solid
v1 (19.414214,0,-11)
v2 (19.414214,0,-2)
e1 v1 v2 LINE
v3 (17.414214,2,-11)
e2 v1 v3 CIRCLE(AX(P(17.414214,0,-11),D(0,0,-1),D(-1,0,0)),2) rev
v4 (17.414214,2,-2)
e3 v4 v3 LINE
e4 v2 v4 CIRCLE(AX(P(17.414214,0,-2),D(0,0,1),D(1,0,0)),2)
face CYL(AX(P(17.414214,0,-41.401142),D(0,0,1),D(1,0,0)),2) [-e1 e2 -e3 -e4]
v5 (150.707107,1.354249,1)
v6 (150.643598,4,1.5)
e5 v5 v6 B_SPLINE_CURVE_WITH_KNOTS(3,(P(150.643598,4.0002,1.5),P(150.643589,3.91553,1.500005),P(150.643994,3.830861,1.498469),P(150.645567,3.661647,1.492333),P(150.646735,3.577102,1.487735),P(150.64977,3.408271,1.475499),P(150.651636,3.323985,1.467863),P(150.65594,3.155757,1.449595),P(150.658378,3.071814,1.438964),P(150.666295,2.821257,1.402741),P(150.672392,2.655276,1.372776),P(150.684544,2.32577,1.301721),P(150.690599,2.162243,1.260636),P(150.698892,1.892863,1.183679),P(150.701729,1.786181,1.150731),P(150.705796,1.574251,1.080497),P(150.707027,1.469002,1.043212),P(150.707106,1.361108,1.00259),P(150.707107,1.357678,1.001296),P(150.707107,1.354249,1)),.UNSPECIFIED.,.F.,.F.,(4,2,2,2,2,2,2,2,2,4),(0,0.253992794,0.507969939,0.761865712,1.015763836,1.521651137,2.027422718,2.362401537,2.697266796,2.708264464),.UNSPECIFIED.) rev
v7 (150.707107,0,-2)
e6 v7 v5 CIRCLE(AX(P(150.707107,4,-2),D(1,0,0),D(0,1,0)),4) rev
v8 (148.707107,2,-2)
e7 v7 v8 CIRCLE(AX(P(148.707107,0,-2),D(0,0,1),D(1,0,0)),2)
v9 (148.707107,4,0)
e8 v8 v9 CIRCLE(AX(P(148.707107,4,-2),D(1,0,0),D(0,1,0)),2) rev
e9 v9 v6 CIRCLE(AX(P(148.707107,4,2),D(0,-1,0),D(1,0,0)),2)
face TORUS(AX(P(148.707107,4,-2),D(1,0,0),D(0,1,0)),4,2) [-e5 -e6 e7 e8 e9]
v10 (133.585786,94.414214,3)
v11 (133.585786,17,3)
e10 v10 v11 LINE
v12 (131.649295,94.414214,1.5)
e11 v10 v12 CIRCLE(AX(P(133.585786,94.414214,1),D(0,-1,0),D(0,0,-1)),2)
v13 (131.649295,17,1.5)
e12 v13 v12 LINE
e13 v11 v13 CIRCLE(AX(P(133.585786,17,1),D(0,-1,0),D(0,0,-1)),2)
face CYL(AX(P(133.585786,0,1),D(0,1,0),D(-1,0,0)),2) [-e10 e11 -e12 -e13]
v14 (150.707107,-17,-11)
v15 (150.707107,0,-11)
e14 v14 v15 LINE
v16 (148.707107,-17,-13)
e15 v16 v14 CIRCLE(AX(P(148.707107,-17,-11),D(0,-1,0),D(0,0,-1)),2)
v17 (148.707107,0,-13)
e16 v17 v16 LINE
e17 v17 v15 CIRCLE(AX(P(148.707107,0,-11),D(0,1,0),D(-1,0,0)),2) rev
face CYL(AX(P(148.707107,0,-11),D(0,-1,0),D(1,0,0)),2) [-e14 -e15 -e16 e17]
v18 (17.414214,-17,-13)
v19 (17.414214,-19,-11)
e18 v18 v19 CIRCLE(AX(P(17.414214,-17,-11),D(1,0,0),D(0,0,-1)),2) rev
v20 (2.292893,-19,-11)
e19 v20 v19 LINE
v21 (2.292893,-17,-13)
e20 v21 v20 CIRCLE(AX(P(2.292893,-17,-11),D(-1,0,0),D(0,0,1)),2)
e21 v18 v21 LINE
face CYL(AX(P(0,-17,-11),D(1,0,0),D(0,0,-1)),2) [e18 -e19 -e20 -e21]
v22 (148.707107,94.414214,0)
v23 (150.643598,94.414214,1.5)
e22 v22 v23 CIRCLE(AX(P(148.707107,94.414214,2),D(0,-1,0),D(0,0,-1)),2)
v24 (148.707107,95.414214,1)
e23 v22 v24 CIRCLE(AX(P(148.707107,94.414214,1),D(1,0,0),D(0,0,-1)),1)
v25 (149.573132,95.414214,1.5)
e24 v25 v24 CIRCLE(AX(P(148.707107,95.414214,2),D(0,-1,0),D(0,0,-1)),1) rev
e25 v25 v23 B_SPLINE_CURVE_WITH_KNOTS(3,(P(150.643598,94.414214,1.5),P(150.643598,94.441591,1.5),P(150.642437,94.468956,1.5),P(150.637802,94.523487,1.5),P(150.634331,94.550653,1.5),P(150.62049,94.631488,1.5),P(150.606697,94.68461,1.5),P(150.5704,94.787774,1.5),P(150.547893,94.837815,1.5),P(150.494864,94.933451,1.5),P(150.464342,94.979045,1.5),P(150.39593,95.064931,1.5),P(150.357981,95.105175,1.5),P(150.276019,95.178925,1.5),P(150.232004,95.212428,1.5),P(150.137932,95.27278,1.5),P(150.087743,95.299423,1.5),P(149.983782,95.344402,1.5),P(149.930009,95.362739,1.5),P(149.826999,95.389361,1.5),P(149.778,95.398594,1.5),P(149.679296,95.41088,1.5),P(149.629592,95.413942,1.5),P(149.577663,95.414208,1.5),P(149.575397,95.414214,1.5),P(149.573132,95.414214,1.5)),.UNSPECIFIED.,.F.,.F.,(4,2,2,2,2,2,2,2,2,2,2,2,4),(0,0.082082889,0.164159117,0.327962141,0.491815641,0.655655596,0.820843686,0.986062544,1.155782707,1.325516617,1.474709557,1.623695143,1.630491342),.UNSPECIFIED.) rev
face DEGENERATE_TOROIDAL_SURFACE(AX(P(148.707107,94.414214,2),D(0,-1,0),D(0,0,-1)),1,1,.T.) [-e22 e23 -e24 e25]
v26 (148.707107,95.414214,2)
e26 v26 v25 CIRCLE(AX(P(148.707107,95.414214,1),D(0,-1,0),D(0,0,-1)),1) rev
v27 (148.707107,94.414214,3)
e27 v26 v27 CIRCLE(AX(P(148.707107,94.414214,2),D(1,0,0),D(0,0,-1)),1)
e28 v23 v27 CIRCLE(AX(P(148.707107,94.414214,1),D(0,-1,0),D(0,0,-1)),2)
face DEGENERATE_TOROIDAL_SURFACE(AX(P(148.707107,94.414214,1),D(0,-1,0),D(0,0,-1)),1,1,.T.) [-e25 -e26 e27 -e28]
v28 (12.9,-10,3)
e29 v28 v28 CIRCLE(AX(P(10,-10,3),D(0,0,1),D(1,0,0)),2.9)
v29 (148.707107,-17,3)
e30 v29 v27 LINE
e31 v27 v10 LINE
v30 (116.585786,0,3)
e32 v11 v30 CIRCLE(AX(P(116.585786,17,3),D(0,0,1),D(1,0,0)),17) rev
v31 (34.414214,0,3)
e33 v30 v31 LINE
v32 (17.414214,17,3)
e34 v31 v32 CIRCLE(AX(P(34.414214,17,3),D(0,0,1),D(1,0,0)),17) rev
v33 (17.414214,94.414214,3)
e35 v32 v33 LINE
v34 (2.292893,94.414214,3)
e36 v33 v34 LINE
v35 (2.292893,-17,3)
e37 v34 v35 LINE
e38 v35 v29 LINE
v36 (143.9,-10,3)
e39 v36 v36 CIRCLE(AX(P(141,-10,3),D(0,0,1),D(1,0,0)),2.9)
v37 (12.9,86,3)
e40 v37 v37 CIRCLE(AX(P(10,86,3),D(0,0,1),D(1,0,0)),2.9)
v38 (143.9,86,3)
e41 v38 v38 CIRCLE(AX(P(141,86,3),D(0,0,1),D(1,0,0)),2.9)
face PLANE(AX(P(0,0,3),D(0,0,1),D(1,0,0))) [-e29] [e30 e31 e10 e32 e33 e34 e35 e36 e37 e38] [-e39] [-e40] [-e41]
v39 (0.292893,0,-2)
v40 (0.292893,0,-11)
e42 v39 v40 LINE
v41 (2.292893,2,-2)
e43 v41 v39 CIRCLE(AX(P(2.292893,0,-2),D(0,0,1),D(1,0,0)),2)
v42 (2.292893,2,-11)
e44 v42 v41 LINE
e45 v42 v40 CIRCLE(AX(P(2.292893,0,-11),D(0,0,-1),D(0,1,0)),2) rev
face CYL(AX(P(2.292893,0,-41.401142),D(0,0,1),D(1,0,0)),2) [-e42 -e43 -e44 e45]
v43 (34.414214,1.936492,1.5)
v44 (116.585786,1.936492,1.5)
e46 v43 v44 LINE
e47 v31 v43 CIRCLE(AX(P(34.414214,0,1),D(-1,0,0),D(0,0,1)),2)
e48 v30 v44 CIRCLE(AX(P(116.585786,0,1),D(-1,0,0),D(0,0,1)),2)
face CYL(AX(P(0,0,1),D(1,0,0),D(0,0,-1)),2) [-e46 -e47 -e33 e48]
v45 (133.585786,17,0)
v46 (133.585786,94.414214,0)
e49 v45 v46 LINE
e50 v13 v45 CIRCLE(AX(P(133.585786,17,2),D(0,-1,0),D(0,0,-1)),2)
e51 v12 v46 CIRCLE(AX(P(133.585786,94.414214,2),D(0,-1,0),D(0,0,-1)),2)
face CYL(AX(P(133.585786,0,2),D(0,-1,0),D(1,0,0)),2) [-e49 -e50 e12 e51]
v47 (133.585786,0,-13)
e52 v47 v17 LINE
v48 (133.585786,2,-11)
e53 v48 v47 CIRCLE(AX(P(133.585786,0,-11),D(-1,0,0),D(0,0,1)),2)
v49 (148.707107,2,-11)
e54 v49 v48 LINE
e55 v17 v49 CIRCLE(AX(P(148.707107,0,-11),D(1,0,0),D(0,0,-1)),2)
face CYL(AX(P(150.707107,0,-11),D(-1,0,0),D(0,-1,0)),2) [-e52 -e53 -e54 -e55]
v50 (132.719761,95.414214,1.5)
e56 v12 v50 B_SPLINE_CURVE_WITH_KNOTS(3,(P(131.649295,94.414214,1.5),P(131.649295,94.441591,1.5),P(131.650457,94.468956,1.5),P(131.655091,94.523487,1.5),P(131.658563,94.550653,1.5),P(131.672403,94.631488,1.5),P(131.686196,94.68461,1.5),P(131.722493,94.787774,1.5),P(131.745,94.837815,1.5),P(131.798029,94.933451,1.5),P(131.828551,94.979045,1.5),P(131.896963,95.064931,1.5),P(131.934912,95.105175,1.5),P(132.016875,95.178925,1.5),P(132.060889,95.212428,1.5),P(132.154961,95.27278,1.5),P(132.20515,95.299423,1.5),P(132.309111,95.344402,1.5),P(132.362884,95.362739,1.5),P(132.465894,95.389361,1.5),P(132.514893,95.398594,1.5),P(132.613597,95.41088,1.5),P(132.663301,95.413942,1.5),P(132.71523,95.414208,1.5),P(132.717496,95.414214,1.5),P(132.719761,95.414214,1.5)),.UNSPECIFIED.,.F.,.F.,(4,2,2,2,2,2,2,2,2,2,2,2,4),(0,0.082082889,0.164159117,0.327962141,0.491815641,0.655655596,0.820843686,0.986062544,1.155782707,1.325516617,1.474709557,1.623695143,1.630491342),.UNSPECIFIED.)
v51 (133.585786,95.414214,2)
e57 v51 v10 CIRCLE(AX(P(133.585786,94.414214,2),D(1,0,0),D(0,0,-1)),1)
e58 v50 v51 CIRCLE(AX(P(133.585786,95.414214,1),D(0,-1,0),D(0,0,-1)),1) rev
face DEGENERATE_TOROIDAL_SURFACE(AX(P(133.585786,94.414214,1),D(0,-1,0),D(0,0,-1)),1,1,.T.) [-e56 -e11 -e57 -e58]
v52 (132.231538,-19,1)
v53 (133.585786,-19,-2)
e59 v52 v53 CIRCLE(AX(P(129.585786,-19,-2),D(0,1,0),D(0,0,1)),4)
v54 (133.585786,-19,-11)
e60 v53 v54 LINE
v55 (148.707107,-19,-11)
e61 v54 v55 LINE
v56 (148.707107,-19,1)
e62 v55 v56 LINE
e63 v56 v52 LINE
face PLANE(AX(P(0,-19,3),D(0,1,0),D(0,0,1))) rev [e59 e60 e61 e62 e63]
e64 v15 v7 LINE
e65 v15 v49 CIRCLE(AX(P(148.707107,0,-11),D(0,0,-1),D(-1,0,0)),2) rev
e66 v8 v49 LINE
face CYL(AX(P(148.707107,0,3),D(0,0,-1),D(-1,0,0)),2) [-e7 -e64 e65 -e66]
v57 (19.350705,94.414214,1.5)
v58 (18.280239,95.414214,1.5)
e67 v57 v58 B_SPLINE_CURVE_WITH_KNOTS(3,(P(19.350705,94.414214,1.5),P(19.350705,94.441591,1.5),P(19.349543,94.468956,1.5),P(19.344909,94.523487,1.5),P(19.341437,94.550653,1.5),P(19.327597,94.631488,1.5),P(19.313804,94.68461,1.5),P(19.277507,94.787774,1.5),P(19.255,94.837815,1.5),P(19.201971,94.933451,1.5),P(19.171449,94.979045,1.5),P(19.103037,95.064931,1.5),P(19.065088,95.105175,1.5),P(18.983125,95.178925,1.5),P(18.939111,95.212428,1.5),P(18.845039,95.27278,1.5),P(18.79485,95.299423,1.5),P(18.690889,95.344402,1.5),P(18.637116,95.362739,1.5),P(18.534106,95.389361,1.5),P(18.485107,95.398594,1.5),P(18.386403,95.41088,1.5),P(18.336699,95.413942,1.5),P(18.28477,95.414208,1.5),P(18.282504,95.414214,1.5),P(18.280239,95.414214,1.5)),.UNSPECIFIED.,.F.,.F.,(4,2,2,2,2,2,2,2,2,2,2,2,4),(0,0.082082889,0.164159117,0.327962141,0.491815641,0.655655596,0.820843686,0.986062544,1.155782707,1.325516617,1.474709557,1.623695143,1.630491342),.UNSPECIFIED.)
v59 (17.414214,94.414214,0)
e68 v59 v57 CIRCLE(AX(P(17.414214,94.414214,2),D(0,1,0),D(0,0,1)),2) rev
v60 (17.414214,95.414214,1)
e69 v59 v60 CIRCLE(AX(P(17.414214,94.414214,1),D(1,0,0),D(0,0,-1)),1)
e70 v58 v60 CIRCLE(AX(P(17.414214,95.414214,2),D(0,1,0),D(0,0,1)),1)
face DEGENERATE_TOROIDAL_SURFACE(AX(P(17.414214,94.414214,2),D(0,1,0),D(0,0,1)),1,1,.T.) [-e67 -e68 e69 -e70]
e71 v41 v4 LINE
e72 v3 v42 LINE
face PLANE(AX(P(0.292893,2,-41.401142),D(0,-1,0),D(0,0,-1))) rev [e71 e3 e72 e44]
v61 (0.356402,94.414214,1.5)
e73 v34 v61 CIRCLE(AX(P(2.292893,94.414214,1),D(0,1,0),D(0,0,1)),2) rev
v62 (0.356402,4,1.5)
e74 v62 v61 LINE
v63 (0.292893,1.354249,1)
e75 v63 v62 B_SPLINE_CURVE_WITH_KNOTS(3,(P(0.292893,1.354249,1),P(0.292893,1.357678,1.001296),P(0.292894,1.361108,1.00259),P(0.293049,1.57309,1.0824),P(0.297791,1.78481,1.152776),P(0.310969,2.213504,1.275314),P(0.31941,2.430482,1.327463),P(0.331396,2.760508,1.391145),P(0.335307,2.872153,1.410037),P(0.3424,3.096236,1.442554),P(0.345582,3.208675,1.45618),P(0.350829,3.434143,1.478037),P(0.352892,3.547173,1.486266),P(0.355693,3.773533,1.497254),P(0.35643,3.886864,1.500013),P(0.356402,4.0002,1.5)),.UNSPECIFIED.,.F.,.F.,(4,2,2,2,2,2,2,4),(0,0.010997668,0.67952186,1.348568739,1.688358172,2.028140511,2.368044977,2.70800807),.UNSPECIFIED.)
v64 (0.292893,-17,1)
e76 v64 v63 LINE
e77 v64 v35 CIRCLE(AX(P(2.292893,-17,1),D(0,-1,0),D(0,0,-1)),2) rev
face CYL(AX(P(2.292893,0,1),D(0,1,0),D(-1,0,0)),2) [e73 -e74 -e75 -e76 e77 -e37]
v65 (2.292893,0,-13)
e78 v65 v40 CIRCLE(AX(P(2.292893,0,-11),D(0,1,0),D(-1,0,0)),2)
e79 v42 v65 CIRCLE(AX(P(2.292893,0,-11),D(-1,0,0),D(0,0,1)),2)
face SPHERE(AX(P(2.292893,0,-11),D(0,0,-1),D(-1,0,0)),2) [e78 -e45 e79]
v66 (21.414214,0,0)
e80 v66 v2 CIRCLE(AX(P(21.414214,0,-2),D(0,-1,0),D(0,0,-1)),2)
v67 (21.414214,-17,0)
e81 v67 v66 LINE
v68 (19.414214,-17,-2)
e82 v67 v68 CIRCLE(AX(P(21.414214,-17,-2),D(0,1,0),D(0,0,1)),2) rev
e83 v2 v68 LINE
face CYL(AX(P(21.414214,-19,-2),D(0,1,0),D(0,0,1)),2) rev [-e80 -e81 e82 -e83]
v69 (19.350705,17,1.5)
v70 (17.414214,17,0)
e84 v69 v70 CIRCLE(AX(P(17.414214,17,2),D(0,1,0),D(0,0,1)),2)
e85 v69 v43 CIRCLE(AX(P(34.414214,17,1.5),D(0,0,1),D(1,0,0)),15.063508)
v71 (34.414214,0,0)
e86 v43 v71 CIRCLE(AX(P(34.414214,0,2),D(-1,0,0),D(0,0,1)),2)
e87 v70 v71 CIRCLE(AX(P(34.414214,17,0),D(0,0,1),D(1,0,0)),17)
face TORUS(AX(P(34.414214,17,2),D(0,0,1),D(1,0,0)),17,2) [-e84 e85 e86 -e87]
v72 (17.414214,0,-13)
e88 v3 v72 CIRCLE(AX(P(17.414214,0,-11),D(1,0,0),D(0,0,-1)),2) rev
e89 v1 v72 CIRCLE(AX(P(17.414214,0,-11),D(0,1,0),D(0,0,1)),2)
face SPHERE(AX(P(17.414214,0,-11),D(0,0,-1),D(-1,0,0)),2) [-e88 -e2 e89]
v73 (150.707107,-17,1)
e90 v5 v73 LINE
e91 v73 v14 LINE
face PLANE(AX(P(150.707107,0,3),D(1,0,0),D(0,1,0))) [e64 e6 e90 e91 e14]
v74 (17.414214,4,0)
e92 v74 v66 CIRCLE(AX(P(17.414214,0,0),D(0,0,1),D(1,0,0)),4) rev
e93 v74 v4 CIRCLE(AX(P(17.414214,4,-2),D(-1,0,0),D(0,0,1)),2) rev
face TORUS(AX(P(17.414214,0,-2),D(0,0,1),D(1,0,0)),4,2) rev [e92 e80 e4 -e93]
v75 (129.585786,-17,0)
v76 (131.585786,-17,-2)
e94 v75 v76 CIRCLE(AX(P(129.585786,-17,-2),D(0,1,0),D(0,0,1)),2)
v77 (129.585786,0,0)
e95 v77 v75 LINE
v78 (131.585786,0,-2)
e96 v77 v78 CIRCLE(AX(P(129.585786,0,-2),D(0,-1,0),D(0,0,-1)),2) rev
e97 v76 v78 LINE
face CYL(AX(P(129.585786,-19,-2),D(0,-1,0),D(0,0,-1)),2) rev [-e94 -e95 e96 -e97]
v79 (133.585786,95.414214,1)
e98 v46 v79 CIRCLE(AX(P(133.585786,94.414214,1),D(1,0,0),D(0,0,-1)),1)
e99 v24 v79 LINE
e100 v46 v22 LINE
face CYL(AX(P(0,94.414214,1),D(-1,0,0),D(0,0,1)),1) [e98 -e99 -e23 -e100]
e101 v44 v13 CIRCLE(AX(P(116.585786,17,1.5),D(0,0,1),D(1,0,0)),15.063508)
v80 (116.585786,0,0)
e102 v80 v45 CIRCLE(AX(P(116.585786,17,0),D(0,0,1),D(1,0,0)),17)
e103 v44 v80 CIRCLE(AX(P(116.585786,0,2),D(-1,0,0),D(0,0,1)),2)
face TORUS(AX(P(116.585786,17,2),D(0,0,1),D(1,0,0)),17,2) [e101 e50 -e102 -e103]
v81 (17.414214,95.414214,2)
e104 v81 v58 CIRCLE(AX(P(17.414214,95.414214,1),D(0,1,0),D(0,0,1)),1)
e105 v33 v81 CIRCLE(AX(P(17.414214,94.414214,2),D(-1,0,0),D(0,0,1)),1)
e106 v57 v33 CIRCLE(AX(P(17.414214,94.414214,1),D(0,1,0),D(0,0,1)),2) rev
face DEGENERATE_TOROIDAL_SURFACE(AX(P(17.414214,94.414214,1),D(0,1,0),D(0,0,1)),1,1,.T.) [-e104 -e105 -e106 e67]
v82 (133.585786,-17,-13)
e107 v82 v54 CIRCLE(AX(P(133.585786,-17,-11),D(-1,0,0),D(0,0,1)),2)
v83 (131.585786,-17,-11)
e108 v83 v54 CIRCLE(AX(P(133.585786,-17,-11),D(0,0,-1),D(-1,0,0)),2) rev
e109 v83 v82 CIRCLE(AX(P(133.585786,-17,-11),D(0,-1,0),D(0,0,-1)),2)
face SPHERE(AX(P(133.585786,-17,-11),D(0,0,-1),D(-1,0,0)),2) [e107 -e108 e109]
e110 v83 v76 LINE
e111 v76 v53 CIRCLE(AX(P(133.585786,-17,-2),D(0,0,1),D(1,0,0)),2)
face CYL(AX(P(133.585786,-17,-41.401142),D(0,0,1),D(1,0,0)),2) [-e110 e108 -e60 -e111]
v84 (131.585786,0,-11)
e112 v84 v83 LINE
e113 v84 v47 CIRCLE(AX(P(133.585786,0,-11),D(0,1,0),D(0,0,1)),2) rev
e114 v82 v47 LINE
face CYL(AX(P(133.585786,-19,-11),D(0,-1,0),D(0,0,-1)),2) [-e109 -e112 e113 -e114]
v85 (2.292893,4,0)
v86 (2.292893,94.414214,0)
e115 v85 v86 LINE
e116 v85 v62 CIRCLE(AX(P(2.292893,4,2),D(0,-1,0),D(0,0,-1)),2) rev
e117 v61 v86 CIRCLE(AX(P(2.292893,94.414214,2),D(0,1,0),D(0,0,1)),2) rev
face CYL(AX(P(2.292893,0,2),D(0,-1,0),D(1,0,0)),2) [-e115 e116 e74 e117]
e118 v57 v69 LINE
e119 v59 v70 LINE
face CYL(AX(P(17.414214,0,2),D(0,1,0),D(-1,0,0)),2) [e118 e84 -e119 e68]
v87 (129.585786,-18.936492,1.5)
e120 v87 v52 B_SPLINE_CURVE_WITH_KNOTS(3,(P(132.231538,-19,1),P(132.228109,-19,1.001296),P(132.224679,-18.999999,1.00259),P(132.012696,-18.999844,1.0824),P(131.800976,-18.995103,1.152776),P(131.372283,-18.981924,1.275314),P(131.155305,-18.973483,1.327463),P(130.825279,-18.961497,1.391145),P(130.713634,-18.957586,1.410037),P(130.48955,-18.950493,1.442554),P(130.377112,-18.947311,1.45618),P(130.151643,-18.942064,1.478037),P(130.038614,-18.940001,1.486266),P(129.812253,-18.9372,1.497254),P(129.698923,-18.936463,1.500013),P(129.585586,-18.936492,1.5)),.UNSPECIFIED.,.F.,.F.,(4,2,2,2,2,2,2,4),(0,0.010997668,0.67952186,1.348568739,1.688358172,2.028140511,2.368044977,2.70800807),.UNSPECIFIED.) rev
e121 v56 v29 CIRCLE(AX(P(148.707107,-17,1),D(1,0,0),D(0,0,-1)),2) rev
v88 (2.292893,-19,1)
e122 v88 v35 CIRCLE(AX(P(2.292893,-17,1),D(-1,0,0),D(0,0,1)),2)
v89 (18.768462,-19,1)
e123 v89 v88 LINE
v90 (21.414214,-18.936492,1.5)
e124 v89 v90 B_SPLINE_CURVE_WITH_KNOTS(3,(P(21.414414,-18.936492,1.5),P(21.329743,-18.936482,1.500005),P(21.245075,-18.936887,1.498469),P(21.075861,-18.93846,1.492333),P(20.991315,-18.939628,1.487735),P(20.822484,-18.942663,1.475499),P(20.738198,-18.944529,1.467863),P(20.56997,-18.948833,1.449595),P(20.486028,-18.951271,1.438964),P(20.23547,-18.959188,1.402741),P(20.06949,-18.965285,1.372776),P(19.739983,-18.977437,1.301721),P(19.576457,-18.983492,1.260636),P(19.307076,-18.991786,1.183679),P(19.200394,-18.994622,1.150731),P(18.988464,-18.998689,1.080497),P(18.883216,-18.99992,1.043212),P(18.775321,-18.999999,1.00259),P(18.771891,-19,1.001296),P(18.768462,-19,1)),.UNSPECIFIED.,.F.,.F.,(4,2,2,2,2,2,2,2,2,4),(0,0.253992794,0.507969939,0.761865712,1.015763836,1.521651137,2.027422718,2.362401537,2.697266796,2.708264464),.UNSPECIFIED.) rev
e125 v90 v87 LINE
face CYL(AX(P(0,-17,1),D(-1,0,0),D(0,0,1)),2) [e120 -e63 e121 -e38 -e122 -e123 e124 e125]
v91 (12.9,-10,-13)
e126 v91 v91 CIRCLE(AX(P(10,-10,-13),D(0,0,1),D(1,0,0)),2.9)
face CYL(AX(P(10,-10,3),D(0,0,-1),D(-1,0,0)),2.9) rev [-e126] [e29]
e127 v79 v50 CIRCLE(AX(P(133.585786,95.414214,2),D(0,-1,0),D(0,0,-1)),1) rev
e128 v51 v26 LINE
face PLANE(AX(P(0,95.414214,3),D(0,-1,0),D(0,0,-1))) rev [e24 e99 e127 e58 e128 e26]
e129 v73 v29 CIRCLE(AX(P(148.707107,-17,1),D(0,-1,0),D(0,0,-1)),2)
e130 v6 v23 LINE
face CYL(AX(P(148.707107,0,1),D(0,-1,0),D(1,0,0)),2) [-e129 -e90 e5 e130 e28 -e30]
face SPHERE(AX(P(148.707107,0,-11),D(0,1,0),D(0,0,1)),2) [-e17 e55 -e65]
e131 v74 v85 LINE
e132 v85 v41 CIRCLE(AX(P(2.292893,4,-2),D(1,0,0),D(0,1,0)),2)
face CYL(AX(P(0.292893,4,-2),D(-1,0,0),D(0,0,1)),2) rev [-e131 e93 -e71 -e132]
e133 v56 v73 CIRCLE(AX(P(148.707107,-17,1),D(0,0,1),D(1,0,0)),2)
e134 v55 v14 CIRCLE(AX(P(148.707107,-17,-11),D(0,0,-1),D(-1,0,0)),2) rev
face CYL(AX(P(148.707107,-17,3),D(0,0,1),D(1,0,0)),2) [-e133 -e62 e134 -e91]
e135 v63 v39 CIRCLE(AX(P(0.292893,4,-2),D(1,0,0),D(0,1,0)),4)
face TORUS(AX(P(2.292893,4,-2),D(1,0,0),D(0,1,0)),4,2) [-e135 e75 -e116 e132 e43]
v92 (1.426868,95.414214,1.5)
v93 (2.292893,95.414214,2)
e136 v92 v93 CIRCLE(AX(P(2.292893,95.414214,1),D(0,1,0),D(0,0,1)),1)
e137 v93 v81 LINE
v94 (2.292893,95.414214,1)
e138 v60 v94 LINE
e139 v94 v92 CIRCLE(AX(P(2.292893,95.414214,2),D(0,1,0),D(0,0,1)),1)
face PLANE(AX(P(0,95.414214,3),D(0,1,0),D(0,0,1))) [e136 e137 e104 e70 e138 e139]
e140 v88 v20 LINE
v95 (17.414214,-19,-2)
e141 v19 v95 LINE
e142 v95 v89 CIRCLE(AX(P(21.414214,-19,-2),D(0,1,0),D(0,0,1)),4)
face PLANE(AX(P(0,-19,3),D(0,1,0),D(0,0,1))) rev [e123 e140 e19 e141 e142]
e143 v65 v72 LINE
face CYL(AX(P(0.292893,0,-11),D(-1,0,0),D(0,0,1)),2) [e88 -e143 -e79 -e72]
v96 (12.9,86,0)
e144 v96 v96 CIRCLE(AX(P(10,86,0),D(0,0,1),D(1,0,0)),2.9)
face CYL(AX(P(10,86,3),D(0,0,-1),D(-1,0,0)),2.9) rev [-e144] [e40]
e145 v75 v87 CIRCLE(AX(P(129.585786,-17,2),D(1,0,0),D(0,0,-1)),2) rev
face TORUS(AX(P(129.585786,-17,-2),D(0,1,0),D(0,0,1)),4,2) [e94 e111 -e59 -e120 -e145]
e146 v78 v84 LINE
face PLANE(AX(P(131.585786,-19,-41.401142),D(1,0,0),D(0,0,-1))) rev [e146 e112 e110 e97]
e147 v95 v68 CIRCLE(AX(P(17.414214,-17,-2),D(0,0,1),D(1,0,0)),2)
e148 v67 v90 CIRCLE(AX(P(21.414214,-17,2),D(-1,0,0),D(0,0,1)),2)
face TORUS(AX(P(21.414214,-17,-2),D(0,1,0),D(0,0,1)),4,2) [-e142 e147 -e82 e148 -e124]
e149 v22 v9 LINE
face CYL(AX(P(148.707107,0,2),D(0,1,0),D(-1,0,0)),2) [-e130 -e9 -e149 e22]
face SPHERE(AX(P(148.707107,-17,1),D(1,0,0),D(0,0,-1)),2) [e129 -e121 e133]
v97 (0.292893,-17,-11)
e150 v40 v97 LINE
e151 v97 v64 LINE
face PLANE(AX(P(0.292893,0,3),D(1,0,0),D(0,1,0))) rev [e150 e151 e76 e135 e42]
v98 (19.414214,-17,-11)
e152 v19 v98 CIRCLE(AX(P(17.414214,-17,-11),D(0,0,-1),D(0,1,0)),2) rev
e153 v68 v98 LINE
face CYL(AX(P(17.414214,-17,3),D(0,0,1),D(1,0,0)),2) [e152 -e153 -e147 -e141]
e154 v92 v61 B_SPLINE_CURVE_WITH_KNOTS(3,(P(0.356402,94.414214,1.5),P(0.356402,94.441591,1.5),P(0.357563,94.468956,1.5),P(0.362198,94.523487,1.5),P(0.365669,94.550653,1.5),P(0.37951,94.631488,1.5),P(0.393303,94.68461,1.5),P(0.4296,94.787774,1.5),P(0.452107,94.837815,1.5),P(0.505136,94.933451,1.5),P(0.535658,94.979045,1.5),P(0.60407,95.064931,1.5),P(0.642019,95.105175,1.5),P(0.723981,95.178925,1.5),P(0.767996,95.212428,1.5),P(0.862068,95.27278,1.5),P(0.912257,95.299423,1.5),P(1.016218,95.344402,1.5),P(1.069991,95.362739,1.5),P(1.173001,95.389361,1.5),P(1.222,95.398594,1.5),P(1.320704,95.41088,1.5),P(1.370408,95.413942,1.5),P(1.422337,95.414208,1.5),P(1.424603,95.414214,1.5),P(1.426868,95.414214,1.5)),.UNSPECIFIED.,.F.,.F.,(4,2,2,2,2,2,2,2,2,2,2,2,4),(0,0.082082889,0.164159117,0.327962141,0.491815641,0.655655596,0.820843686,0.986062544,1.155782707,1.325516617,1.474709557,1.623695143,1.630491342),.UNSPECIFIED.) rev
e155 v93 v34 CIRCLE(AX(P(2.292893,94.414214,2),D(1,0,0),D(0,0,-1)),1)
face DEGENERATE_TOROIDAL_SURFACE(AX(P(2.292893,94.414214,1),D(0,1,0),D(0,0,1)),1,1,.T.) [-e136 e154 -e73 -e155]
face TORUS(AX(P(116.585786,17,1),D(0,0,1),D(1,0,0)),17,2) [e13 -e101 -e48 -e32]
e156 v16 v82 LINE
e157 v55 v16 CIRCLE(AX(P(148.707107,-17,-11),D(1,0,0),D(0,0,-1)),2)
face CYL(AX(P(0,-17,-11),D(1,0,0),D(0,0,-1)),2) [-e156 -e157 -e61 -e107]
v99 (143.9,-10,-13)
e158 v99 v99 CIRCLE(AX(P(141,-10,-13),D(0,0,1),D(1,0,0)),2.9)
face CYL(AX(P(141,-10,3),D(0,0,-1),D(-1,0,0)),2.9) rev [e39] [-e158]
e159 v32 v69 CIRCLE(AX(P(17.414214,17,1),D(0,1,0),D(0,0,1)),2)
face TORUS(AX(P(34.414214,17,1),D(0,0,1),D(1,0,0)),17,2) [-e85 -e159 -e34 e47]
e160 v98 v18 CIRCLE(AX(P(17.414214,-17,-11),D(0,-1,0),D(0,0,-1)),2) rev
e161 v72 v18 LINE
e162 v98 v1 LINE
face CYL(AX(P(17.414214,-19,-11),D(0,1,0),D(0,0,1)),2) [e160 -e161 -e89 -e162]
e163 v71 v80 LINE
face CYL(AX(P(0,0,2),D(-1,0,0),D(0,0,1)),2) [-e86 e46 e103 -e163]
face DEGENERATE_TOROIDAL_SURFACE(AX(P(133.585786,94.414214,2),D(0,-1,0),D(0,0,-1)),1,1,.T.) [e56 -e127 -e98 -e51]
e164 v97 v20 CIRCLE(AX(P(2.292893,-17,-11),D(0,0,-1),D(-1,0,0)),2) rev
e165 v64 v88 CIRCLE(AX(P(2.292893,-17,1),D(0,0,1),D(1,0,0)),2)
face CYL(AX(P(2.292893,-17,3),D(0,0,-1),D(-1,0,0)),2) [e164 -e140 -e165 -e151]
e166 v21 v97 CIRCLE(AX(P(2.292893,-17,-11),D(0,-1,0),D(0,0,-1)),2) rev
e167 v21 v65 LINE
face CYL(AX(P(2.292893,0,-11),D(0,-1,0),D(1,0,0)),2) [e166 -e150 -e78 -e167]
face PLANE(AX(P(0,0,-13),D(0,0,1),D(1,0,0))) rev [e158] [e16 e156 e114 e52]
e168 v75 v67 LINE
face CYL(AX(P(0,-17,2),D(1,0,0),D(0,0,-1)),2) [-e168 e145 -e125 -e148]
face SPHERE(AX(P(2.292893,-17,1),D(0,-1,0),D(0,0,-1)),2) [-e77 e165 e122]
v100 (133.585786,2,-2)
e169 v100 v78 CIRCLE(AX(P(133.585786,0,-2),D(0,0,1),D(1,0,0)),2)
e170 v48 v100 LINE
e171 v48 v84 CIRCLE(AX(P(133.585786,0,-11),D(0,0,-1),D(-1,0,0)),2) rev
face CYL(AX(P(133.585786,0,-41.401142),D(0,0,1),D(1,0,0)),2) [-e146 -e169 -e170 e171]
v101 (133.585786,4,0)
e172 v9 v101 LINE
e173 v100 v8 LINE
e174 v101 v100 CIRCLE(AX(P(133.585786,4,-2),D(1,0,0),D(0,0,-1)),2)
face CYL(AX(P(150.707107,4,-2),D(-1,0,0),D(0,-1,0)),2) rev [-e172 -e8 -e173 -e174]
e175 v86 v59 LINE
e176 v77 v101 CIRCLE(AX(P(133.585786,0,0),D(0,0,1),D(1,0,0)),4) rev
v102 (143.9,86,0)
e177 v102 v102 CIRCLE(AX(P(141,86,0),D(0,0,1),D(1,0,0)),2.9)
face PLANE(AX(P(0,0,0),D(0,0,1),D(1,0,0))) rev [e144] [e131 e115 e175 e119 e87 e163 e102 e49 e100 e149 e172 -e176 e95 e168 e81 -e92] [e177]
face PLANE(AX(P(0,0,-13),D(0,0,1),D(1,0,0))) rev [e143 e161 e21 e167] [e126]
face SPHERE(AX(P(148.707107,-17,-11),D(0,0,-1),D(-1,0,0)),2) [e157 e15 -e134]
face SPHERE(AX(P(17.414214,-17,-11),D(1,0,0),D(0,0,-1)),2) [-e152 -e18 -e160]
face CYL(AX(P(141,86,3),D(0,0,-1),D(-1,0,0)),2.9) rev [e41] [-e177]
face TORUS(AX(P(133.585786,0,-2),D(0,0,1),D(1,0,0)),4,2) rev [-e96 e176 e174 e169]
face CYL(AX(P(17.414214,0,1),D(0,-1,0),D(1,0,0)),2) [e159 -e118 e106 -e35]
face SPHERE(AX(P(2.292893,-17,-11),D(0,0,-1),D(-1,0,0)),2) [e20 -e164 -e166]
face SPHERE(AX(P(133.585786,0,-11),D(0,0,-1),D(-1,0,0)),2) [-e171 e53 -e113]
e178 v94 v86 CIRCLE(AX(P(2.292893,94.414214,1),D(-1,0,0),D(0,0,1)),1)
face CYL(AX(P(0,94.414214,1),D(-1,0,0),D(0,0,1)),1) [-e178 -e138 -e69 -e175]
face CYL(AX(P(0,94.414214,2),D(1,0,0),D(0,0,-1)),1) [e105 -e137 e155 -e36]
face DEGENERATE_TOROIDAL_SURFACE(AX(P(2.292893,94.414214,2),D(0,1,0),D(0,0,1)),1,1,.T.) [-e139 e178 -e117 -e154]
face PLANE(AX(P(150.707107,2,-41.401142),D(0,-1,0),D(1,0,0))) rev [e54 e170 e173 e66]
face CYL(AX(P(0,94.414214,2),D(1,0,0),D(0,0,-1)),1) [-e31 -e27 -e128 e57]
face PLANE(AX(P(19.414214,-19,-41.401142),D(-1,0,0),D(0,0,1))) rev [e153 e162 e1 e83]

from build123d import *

# Parameters (mm, degrees)
ESQUISSE1_W        = 19.121320343
ESQUISSE1_H        = 114.414213562
ESQUISSE1_R        = 2.9
ESQUISSE1_W_2      = 112.171572876
ESQUISSE1_H_2      = 21
BOSS_EXTRU_1_DEPTH = 3
BOSS_EXTRU_2_START = 13
ESQUISSE2_W        = 19.121320343
ESQUISSE2_H        = 21
ESQUISSE2_R        = 2.9
BOSS_EXTRU_2_DEPTH = 13
CONG_1_R           = 15
CONG_2_R           = 2
CONG_3_R           = 1


# Some blends are built 0.0001 mm under size
with BuildPart() as part:
    # Esquisse1 → Boss.-Extru.1 (new body)
    # profile 1 of 3: a face of its own
    with BuildSketch(Plane.XY):
        with Locations((9.853553391, 38.207106781)):
            Rectangle(ESQUISSE1_W, ESQUISSE1_H)
        with Locations((10, 86)):
            Circle(ESQUISSE1_R, mode=Mode.SUBTRACT)
        with Locations((10, -10)):
            Circle(ESQUISSE1_R, mode=Mode.SUBTRACT)
    # profile 2 of 3: a face of its own
    with BuildSketch(Plane.XY):
        with Locations((75.5, -8.5)):
            Rectangle(ESQUISSE1_W_2, ESQUISSE1_H_2)
    # profile 3 of 3: a face of its own
    with BuildSketch(Plane.XY):
        with Locations((141.14644661, 38.207106781)):
            Rectangle(ESQUISSE1_W, ESQUISSE1_H)
        with Locations((141, 86)):
            Circle(ESQUISSE1_R, mode=Mode.SUBTRACT)
        with Locations((141, -10)):
            Circle(ESQUISSE1_R, mode=Mode.SUBTRACT)
    extrude(amount=BOSS_EXTRU_1_DEPTH)

    # Esquisse2 → Boss.-Extru.2 (add)
    # profile 1 of 2: a face of its own
    with BuildSketch(Plane(origin=(0, 0, 0), x_dir=(-1, 0, 0), z_dir=(0, 0, -1)).offset(BOSS_EXTRU_2_START)):
        with Locations((-141.14644661, -8.5)):
            Rectangle(ESQUISSE2_W, ESQUISSE2_H)
        with Locations(Location((-141, -10, 0), (0, 0, 180))):
            Circle(ESQUISSE2_R, mode=Mode.SUBTRACT)
    # profile 2 of 2: a face of its own
    with BuildSketch(Plane(origin=(0, 0, 0), x_dir=(-1, 0, 0), z_dir=(0, 0, -1)).offset(BOSS_EXTRU_2_START)):
        with Locations((-9.853553391, -8.5)):
            Rectangle(ESQUISSE2_W, ESQUISSE2_H)
        with Locations(Location((-10, -10, 0), (0, 0, 180))):
            Circle(ESQUISSE2_R, mode=Mode.SUBTRACT)
    extrude(amount=-BOSS_EXTRU_2_DEPTH)

    # Congé1
    # the kernel refuses this fillet: 15 mm, written as the material it adds along each edge
    with BuildSketch(Plane(origin=(19.414213562, 2, 0), x_dir=(0, 1, 0), z_dir=(0, 0, 1)), Plane(origin=(131.585786438, 2, 0), x_dir=(-1, 0, 0), z_dir=(0, 0, 1))) as cong_1_piece_1:
        with BuildLine():
            CenterArc((CONG_1_R, -CONG_1_R), CONG_1_R, 90, 90)
            Line((0, -CONG_1_R), (0, 0))
            Line((0, 0), (CONG_1_R, 0))
        make_face()
    extrude(amount=3)

    # Congé2
    # the kernel refuses this fillet: 2 mm, written as the material it takes off along each edge
    with BuildSketch(Plane(origin=(17.414213562, 0, -11), x_dir=(0, 0, -1), z_dir=(1, 0, 0))) as cong_2_piece_1_section:
        Polygon((0, 0), (CONG_2_R, 0), (CONG_2_R, CONG_2_R), (0, CONG_2_R), align=None)
    cong_2_piece_1 = extrude(amount=CONG_2_R, mode=Mode.PRIVATE)
    cong_2_piece_1 = cong_2_piece_1 - Plane(origin=(17.414213562, 0, -11), x_dir=(0, -0.7071067811865475, 0.7071067811865475), z_dir=(1, 0, 0)) * Sphere(CONG_2_R, mode=Mode.PRIVATE)
    add(cong_2_piece_1, mode=Mode.SUBTRACT)
    with BuildSketch(Plane(origin=(133.585786438, 0, -11), x_dir=(0, 0, -1), z_dir=(-1, 0, 0))) as cong_2_piece_2_section:
        Polygon((0, 0), (CONG_2_R, 0), (CONG_2_R, -CONG_2_R), (0, -CONG_2_R), align=None)
    cong_2_piece_2 = extrude(amount=CONG_2_R, mode=Mode.PRIVATE)
    cong_2_piece_2 = cong_2_piece_2 - Plane(origin=(133.585786438, 0, -11), x_dir=(0, -0.7071067811865475, 0.7071067811865475), z_dir=(-1, 0, 0)) * Sphere(CONG_2_R, mode=Mode.PRIVATE)
    add(cong_2_piece_2, mode=Mode.SUBTRACT)
    with BuildSketch(Plane(origin=(2.292893219, -17, -11), x_dir=(0, -1, 0), z_dir=(-1, 0, 0))) as cong_2_piece_3_section:
        Polygon((0, 0), (CONG_2_R, 0), (CONG_2_R, -CONG_2_R), (0, -CONG_2_R), align=None)
    cong_2_piece_3 = extrude(amount=CONG_2_R, mode=Mode.PRIVATE)
    cong_2_piece_3 = cong_2_piece_3 - Plane(origin=(2.292893219, -17, -11), x_dir=(0, 0.7071067811865475, 0.7071067811865475), z_dir=(-1, 0, 0)) * Sphere(CONG_2_R, mode=Mode.PRIVATE)
    add(cong_2_piece_3, mode=Mode.SUBTRACT)
    with BuildSketch(Plane(origin=(2.292893219, -17, 1), x_dir=(0, -1, 0), z_dir=(-1, 0, 0))) as cong_2_piece_4_section:
        Polygon((0, 0), (CONG_2_R, 0), (CONG_2_R, CONG_2_R), (0, CONG_2_R), align=None)
    cong_2_piece_4 = extrude(amount=CONG_2_R, mode=Mode.PRIVATE)
    cong_2_piece_4 = cong_2_piece_4 - Plane(origin=(2.292893219, -17, 1), x_dir=(0, 0.7071067811865475, -0.7071067811865475), z_dir=(-1, 0, 0)) * Sphere(CONG_2_R, mode=Mode.PRIVATE)
    add(cong_2_piece_4, mode=Mode.SUBTRACT)
    with BuildSketch(Plane(origin=(148.707106781, -17, -11), x_dir=(1, 0, 0), z_dir=(0, -1, 0))) as cong_2_piece_5_section:
        Polygon((0, 0), (CONG_2_R, 0), (CONG_2_R, -CONG_2_R), (0, -CONG_2_R), align=None)
    cong_2_piece_5 = extrude(amount=CONG_2_R, mode=Mode.PRIVATE)
    cong_2_piece_5 = cong_2_piece_5 - Plane(origin=(148.707106781, -17, -11), x_dir=(-0.7071067811865475, 0, 0.7071067811865475), z_dir=(0, -1, 0)) * Sphere(CONG_2_R, mode=Mode.PRIVATE)
    add(cong_2_piece_5, mode=Mode.SUBTRACT)
    with BuildSketch(Plane(origin=(148.707106781, -17, 1), x_dir=(1, 0, 0), z_dir=(0, -1, 0))) as cong_2_piece_6_section:
        Polygon((0, 0), (CONG_2_R, 0), (CONG_2_R, CONG_2_R), (0, CONG_2_R), align=None)
    cong_2_piece_6 = extrude(amount=CONG_2_R, mode=Mode.PRIVATE)
    cong_2_piece_6 = cong_2_piece_6 - Plane(origin=(148.707106781, -17, 1), x_dir=(-0.7071067811865475, 0, -0.7071067811865475), z_dir=(0, -1, 0)) * Sphere(CONG_2_R, mode=Mode.PRIVATE)
    add(cong_2_piece_6, mode=Mode.SUBTRACT)
    with BuildSketch(Plane(origin=(17.414213562, 2, -13), x_dir=(0, 0, 1), z_dir=(-1, 0, 0)), Plane(origin=(2.292893219, -19, -13), x_dir=(0, 0, 1), z_dir=(1, 0, 0)), Plane(origin=(126.585786438, -19, -13), x_dir=(0, 0, 1), z_dir=(1, 0, 0))) as cong_2_piece_7:
        with BuildLine():
            CenterArc((CONG_2_R, -CONG_2_R), CONG_2_R, 90, 90)
            Line((0, -CONG_2_R), (0, 0))
            Line((0, 0), (CONG_2_R, 0))
        make_face()
    extrude(amount=22.121320344, mode=Mode.SUBTRACT)
    with BuildSketch(Plane(origin=(155.707106781, 2, -13), x_dir=(0, -1, 0), z_dir=(-1, 0, 0))) as cong_2_piece_8:
        with BuildLine():
            CenterArc((CONG_2_R, CONG_2_R), CONG_2_R, 180, 90)
            Line((0, CONG_2_R), (0, 0))
            Line((0, 0), (CONG_2_R, 0))
        make_face()
    extrude(amount=22.121320344, mode=Mode.SUBTRACT)
    with BuildSketch(Plane(origin=(19.414213562, 17, 3), x_dir=(0, 0, -1), z_dir=(0, 1, 0)), Plane(origin=(131.585786438, 17, 3), x_dir=(1, 0, 0), z_dir=(0, 1, 0))) as cong_2_piece_9:
        with BuildLine():
            CenterArc((CONG_2_R, CONG_2_R), CONG_2_R, 180, 90)
            Line((0, CONG_2_R), (0, 0))
            Line((0, 0), (CONG_2_R, 0))
        make_face()
    extrude(amount=83.414213562, mode=Mode.SUBTRACT)
    with BuildSketch(Plane(origin=(19.414213562, 17, 0), x_dir=(0, 0, 1), z_dir=(0, 1, 0)), Plane(origin=(131.585786438, 17, 0), x_dir=(1, 0, 0), z_dir=(0, 1, 0))) as cong_2_piece_10:
        with BuildLine():
            CenterArc((CONG_2_R, -CONG_2_R), CONG_2_R, 90, 90)
            Line((0, -CONG_2_R), (0, 0))
            Line((0, 0), (CONG_2_R, 0))
        make_face()
    extrude(amount=83.414213562, mode=Mode.SUBTRACT)
    with BuildSketch(Plane(origin=(34.414213562, 17, 3), x_dir=(-1, 0, 0), z_dir=(0, 1, 0))) as cong_2_piece_11:
        with BuildLine():
            CenterArc((15 + CONG_2_R, -CONG_2_R), CONG_2_R, 90, 90)
            Line((15 + CONG_2_R, 0), (15, 0))
            Line((15, 0), (15, -CONG_2_R))
        make_face()
    revolve(axis=Axis((34.414213562, 17, 3), (0, 0, 1)), revolution_arc=90, mode=Mode.SUBTRACT)
    with BuildSketch(Plane(origin=(34.414213562, 17, 0), x_dir=(-1, 0, 0), z_dir=(0, 1, 0))) as cong_2_piece_12:
        with BuildLine():
            CenterArc((15 + CONG_2_R, CONG_2_R), CONG_2_R, 180, 90)
            Line((15 + CONG_2_R, 0), (15, 0))
            Line((15, 0), (15, CONG_2_R))
        make_face()
    revolve(axis=Axis((34.414213562, 17, 0), (0, 0, 1)), revolution_arc=90, mode=Mode.SUBTRACT)
    with BuildSketch(Plane(origin=(116.585786438, 2, 3), x_dir=(0, 0, -1), z_dir=(-1, 0, 0))) as cong_2_piece_13:
        with BuildLine():
            CenterArc((CONG_2_R, CONG_2_R), CONG_2_R, 180, 90)
            Line((0, CONG_2_R), (0, 0))
            Line((0, 0), (CONG_2_R, 0))
        make_face()
    extrude(amount=82.171572875, mode=Mode.SUBTRACT)
    with BuildSketch(Plane(origin=(116.585786438, 2, 0), x_dir=(0, 0, 1), z_dir=(-1, 0, 0))) as cong_2_piece_14:
        with BuildLine():
            CenterArc((CONG_2_R, -CONG_2_R), CONG_2_R, 90, 90)
            Line((0, -CONG_2_R), (0, 0))
            Line((0, 0), (CONG_2_R, 0))
        make_face()
    extrude(amount=82.171572875, mode=Mode.SUBTRACT)
    with BuildSketch(Plane(origin=(0.292893219, -19, -11), x_dir=(0, 1, 0), z_dir=(0, 0, 1)), Plane(origin=(150.707106781, -19, -11), x_dir=(-1, 0, 0), z_dir=(0, 0, 1))) as cong_2_piece_15:
        with BuildLine():
            CenterArc((CONG_2_R, -CONG_2_R), CONG_2_R, 90, 90)
            Line((0, -CONG_2_R), (0, 0))
            Line((0, 0), (CONG_2_R, 0))
        make_face()
    extrude(amount=12, mode=Mode.SUBTRACT)
    with BuildSketch(Plane(origin=(19.414213562, -24, -13), x_dir=(0, 0, 1), z_dir=(0, 1, 0)), Plane(origin=(150.707106781, -17, -13), x_dir=(0, 0, 1), z_dir=(0, 1, 0)), Plane(origin=(131.585786438, 0, -13), x_dir=(0, 0, 1), z_dir=(0, -1, 0)), Plane(origin=(0.292893219, 7, -13), x_dir=(0, 0, 1), z_dir=(0, -1, 0))) as cong_2_piece_16:
        with BuildLine():
            CenterArc((CONG_2_R, -CONG_2_R), CONG_2_R, 90, 90)
            Line((0, -CONG_2_R), (0, 0))
            Line((0, 0), (CONG_2_R, 0))
        make_face()
    extrude(amount=24, mode=Mode.SUBTRACT)
    with BuildSketch(Plane(origin=(19.414213562, 2, -11), x_dir=(-1, 0, 0), z_dir=(0, 0, 1)), Plane(origin=(131.585786438, 2, -11), x_dir=(0, -1, 0), z_dir=(0, 0, 1))) as cong_2_piece_17:
        with BuildLine():
            CenterArc((CONG_2_R, CONG_2_R), CONG_2_R, 180, 90)
            Line((0, CONG_2_R), (0, 0))
            Line((0, 0), (CONG_2_R, 0))
        make_face()
    extrude(amount=11, mode=Mode.SUBTRACT)
    with BuildSketch(Plane(origin=(0.292893219, 100.414213562, 3), x_dir=(1, 0, 0), z_dir=(0, -1, 0))) as cong_2_piece_18:
        with BuildLine():
            CenterArc((CONG_2_R, -CONG_2_R), CONG_2_R, 90, 90)
            Line((0, -CONG_2_R), (0, 0))
            Line((0, 0), (CONG_2_R, 0))
        make_face()
    extrude(amount=117.414213562, mode=Mode.SUBTRACT)
    with BuildSketch(Plane(origin=(148.707106781, -19, 3), x_dir=(0, 1, 0), z_dir=(-1, 0, 0))) as cong_2_piece_19:
        with BuildLine():
            CenterArc((CONG_2_R, CONG_2_R), CONG_2_R, 180, 90)
            Line((0, CONG_2_R), (0, 0))
            Line((0, 0), (CONG_2_R, 0))
        make_face()
    extrude(amount=146.414213562, mode=Mode.SUBTRACT)
    with BuildSketch(Plane(origin=(116.585786438, 17, 3), x_dir=(0, -1, 0), z_dir=(-1, 0, 0))) as cong_2_piece_20:
        with BuildLine():
            CenterArc((15 + CONG_2_R, -CONG_2_R), CONG_2_R, 90, 90)
            Line((15, -CONG_2_R), (15, 0))
            Line((15, 0), (15 + CONG_2_R, 0))
        make_face()
    revolve(axis=Axis((116.585786438, 17, 3), (0, 0, 1)), revolution_arc=90, mode=Mode.SUBTRACT)
    with BuildSketch(Plane(origin=(116.585786438, 17, 0), x_dir=(0, -1, 0), z_dir=(-1, 0, 0))) as cong_2_piece_21:
        with BuildLine():
            CenterArc((15 + CONG_2_R, CONG_2_R), CONG_2_R, 180, 90)
            Line((15, CONG_2_R), (15, 0))
            Line((15, 0), (15 + CONG_2_R, 0))
        make_face()
    revolve(axis=Axis((116.585786438, 17, 0), (0, 0, 1)), revolution_arc=90, mode=Mode.SUBTRACT)
    with BuildSketch(Plane(origin=(150.707106781, 100.414213562, 3), x_dir=(-1, 0, 0), z_dir=(0, -1, 0))) as cong_2_piece_22:
        with BuildLine():
            CenterArc((CONG_2_R, CONG_2_R), CONG_2_R, 180, 90)
            Line((0, CONG_2_R), (0, 0))
            Line((0, 0), (CONG_2_R, 0))
        make_face()
    extrude(amount=117.414213562, mode=Mode.SUBTRACT)
    # the kernel refuses this fillet: 2 mm, written as the material it adds along each edge
    with BuildSketch(Plane(origin=(17.414213562, 2, 0), x_dir=(0, 1, 0), z_dir=(-1, 0, 0)), Plane(origin=(150.707106781, 2, 0), x_dir=(0, 1, 0), z_dir=(-1, 0, 0))) as cong_2_2_piece_1:
        with BuildLine():
            CenterArc((CONG_2_R, CONG_2_R), CONG_2_R, 180, 90)
            Line((0, CONG_2_R), (0, 0))
            Line((0, 0), (CONG_2_R, 0))
        make_face()
    extrude(amount=17.121320344)
    with BuildSketch(Plane(origin=(19.414213562, -19, 0), x_dir=(1, 0, 0), z_dir=(0, 1, 0)), Plane(origin=(131.585786438, 0, 0), x_dir=(-1, 0, 0), z_dir=(0, -1, 0))) as cong_2_2_piece_2:
        with BuildLine():
            CenterArc((CONG_2_R, CONG_2_R), CONG_2_R, 180, 90)
            Line((0, CONG_2_R), (0, 0))
            Line((0, 0), (CONG_2_R, 0))
        make_face()
    extrude(amount=19)
    with BuildSketch(Plane(origin=(133.585786438, 0, 0), x_dir=(-1, 0, 0), z_dir=(0, -1, 0))) as cong_2_2_piece_3:
        with BuildLine():
            CenterArc((2 + CONG_2_R, CONG_2_R), CONG_2_R, 180, 90)
            Line((2, CONG_2_R), (2, 0))
            Line((2, 0), (2 + CONG_2_R, 0))
        make_face()
    revolve(axis=Axis((133.585786438, 0, 0), (0, 0, -1)), revolution_arc=90)
    with BuildSketch(Plane(origin=(17.414213562, 0, 0), x_dir=(0, 1, 0), z_dir=(-1, 0, 0))) as cong_2_2_piece_4:
        with BuildLine():
            CenterArc((2 + CONG_2_R, CONG_2_R), CONG_2_R, 180, 90)
            Line((2, CONG_2_R), (2, 0))
            Line((2, 0), (2 + CONG_2_R, 0))
        make_face()
    revolve(axis=Axis((17.414213562, 0, 0), (0, 0, -1)), revolution_arc=90)
    # the kernel refuses this fillet: 2 mm, written as the material it takes off along each edge
    with BuildSketch(Plane(origin=(133.585786438, -17, -11), x_dir=(-1, 0, 0), z_dir=(0, -1, 0))) as cong_2_3_piece_1_section:
        Polygon((0, 0), (CONG_2_R, 0), (CONG_2_R, CONG_2_R), (0, CONG_2_R), align=None)
    cong_2_3_piece_1 = extrude(amount=CONG_2_R, mode=Mode.PRIVATE)
    cong_2_3_piece_1 = cong_2_3_piece_1 - Plane(origin=(133.585786438, -17, -11), x_dir=(0.7071067811865475, 0, 0.7071067811865475), z_dir=(0, -1, 0)) * Sphere(CONG_2_R, mode=Mode.PRIVATE)
    add(cong_2_3_piece_1, mode=Mode.SUBTRACT)
    with BuildSketch(Plane(origin=(17.414213562, -17, -11), x_dir=(1, 0, 0), z_dir=(0, -1, 0))) as cong_2_3_piece_2_section:
        Polygon((0, 0), (CONG_2_R, 0), (CONG_2_R, -CONG_2_R), (0, -CONG_2_R), align=None)
    cong_2_3_piece_2 = extrude(amount=CONG_2_R, mode=Mode.PRIVATE)
    cong_2_3_piece_2 = cong_2_3_piece_2 - Plane(origin=(17.414213562, -17, -11), x_dir=(-0.7071067811865475, 0, 0.7071067811865475), z_dir=(0, -1, 0)) * Sphere(CONG_2_R, mode=Mode.PRIVATE)
    add(cong_2_3_piece_2, mode=Mode.SUBTRACT)
    with BuildSketch(Plane(origin=(2.292893219, 0, -11), x_dir=(0, 1, 0), z_dir=(-1, 0, 0))) as cong_2_3_piece_3_section:
        Polygon((0, 0), (CONG_2_R, 0), (CONG_2_R, CONG_2_R), (0, CONG_2_R), align=None)
    cong_2_3_piece_3 = extrude(amount=CONG_2_R, mode=Mode.PRIVATE)
    cong_2_3_piece_3 = cong_2_3_piece_3 - Plane(origin=(2.292893219, 0, -11), x_dir=(0, -0.7071067811865475, 0.7071067811865475), z_dir=(-1, 0, 0)) * Sphere(CONG_2_R, mode=Mode.PRIVATE)
    add(cong_2_3_piece_3, mode=Mode.SUBTRACT)
    with BuildSketch(Plane(origin=(148.707106781, 0, -11), x_dir=(0, 1, 0), z_dir=(1, 0, 0))) as cong_2_3_piece_4_section:
        Polygon((0, 0), (CONG_2_R, 0), (CONG_2_R, -CONG_2_R), (0, -CONG_2_R), align=None)
    cong_2_3_piece_4 = extrude(amount=CONG_2_R, mode=Mode.PRIVATE)
    cong_2_3_piece_4 = cong_2_3_piece_4 - Plane(origin=(148.707106781, 0, -11), x_dir=(0, -0.7071067811865475, 0.7071067811865475), z_dir=(1, 0, 0)) * Sphere(CONG_2_R, mode=Mode.PRIVATE)
    add(cong_2_3_piece_4, mode=Mode.SUBTRACT)
    with BuildSketch(Plane(origin=(0.292893219, 100.414213562, 0), x_dir=(1, 0, 0), z_dir=(0, -1, 0))) as cong_2_3_piece_5:
        with BuildLine():
            CenterArc((CONG_2_R, CONG_2_R), CONG_2_R, 180, 90)
            Line((0, CONG_2_R), (0, 0))
            Line((0, 0), (CONG_2_R, 0))
        make_face()
    extrude(amount=96.414213562, mode=Mode.SUBTRACT)
    with BuildSketch(Plane(origin=(150.707106781, 100.414213562, 0), x_dir=(-1, 0, 0), z_dir=(0, -1, 0))) as cong_2_3_piece_6:
        with BuildLine():
            CenterArc((CONG_2_R, -CONG_2_R), CONG_2_R, 90, 90)
            Line((0, -CONG_2_R), (0, 0))
            Line((0, 0), (CONG_2_R, 0))
        make_face()
    extrude(amount=96.414213562, mode=Mode.SUBTRACT)
    with BuildSketch(Plane(origin=(21.414213562, -19, 0), x_dir=(0, 1, 0), z_dir=(1, 0, 0))) as cong_2_3_piece_7:
        with BuildLine():
            CenterArc((CONG_2_R, CONG_2_R), CONG_2_R, 180, 90)
            Line((0, CONG_2_R), (0, 0))
            Line((0, 0), (CONG_2_R, 0))
        make_face()
    extrude(amount=108.171572875, mode=Mode.SUBTRACT)
    with BuildSketch(Plane(origin=(150.707106781, 2, -11), x_dir=(0, -1, 0), z_dir=(0, 0, 1)), Plane(origin=(19.414213562, -19, -11), x_dir=(-1, 0, 0), z_dir=(0, 0, 1))) as cong_2_3_piece_8:
        with BuildLine():
            CenterArc((CONG_2_R, -CONG_2_R), CONG_2_R, 90, 90)
            Line((0, -CONG_2_R), (0, 0))
            Line((0, 0), (CONG_2_R, 0))
        make_face()
    extrude(amount=9, mode=Mode.SUBTRACT)
    with BuildSketch(Plane(origin=(0.292893219, 2, -11), x_dir=(0, -1, 0), z_dir=(0, 0, 1)), Plane(origin=(131.585786438, -19, -11), x_dir=(1, 0, 0), z_dir=(0, 0, 1))) as cong_2_3_piece_9:
        with BuildLine():
            CenterArc((CONG_2_R, CONG_2_R), CONG_2_R, 180, 90)
            Line((0, CONG_2_R), (0, 0))
            Line((0, 0), (CONG_2_R, 0))
        make_face()
    extrude(amount=9, mode=Mode.SUBTRACT)
    with BuildSketch(Plane(origin=(129.585786438, -19, -2), x_dir=(0, 0, 1), z_dir=(-1, 0, 0))) as cong_2_3_piece_10:
        with BuildLine():
            CenterArc((2 + CONG_2_R, CONG_2_R), CONG_2_R, 180, 90)
            Line((2, CONG_2_R), (2, 0))
            Line((2, 0), (2 + CONG_2_R, 0))
        make_face()
    revolve(axis=Axis((129.585786438, -19, -2), (0, 1, 0)), revolution_arc=90, mode=Mode.SUBTRACT)
    with BuildSketch(Plane(origin=(21.414213562, -19, -2), x_dir=(0, 0, 1), z_dir=(1, 0, 0))) as cong_2_3_piece_11:
        with BuildLine():
            CenterArc((2 + CONG_2_R, -CONG_2_R), CONG_2_R, 90, 90)
            Line((2 + CONG_2_R, 0), (2, 0))
            Line((2, 0), (2, -CONG_2_R))
        make_face()
    revolve(axis=Axis((21.414213562, -19, -2), (0, -1, 0)), revolution_arc=90, mode=Mode.SUBTRACT)
    with BuildSketch(Plane(origin=(0.292893219, 4, -2), x_dir=(0, 0, 1), z_dir=(0, 1, 0))) as cong_2_3_piece_12:
        with BuildLine():
            CenterArc((2 + CONG_2_R, CONG_2_R), CONG_2_R, 180, 90)
            Line((2, CONG_2_R), (2, 0))
            Line((2, 0), (2 + CONG_2_R, 0))
        make_face()
    revolve(axis=Axis((0.292893219, 4, -2), (1, 0, 0)), revolution_arc=90, mode=Mode.SUBTRACT)
    with BuildSketch(Plane(origin=(150.707106781, 4, -2), x_dir=(0, 0, 1), z_dir=(0, 1, 0))) as cong_2_3_piece_13:
        with BuildLine():
            CenterArc((2 + CONG_2_R, -CONG_2_R), CONG_2_R, 90, 90)
            Line((2 + CONG_2_R, 0), (2, 0))
            Line((2, 0), (2, -CONG_2_R))
        make_face()
    revolve(axis=Axis((150.707106781, 4, -2), (1, 0, 0)), revolution_arc=90, mode=Mode.SUBTRACT)

    # Congé3
    cong_3_edges = [part.edges().sort_by_distance(p)[0] for p in [
        (9.853553391, 95.414213562, 3),
        (1.068148347, 95.414213562, 2.58113883),
        (1.068148347, 95.414213562, 0.41886117),
        (18.638958434, 95.414213562, 2.58113883),
        (18.638958434, 95.414213562, 0.41886117),
        (141.146446609, 95.414213562, 3),
        (149.931851653, 95.414213562, 2.58113883),
        (149.931851653, 95.414213562, 0.41886117),
        (132.361041566, 95.414213562, 2.58113883),
        (132.361041566, 95.414213562, 0.41886117),
        (9.853553391, 95.414213562, 0),
        (141.146446609, 95.414213562, 0),
    ]]
    fillet(cong_3_edges, radius=CONG_3_R - 0.0001)  # a hair under: the kernel refuses the full size


solid = part.part
